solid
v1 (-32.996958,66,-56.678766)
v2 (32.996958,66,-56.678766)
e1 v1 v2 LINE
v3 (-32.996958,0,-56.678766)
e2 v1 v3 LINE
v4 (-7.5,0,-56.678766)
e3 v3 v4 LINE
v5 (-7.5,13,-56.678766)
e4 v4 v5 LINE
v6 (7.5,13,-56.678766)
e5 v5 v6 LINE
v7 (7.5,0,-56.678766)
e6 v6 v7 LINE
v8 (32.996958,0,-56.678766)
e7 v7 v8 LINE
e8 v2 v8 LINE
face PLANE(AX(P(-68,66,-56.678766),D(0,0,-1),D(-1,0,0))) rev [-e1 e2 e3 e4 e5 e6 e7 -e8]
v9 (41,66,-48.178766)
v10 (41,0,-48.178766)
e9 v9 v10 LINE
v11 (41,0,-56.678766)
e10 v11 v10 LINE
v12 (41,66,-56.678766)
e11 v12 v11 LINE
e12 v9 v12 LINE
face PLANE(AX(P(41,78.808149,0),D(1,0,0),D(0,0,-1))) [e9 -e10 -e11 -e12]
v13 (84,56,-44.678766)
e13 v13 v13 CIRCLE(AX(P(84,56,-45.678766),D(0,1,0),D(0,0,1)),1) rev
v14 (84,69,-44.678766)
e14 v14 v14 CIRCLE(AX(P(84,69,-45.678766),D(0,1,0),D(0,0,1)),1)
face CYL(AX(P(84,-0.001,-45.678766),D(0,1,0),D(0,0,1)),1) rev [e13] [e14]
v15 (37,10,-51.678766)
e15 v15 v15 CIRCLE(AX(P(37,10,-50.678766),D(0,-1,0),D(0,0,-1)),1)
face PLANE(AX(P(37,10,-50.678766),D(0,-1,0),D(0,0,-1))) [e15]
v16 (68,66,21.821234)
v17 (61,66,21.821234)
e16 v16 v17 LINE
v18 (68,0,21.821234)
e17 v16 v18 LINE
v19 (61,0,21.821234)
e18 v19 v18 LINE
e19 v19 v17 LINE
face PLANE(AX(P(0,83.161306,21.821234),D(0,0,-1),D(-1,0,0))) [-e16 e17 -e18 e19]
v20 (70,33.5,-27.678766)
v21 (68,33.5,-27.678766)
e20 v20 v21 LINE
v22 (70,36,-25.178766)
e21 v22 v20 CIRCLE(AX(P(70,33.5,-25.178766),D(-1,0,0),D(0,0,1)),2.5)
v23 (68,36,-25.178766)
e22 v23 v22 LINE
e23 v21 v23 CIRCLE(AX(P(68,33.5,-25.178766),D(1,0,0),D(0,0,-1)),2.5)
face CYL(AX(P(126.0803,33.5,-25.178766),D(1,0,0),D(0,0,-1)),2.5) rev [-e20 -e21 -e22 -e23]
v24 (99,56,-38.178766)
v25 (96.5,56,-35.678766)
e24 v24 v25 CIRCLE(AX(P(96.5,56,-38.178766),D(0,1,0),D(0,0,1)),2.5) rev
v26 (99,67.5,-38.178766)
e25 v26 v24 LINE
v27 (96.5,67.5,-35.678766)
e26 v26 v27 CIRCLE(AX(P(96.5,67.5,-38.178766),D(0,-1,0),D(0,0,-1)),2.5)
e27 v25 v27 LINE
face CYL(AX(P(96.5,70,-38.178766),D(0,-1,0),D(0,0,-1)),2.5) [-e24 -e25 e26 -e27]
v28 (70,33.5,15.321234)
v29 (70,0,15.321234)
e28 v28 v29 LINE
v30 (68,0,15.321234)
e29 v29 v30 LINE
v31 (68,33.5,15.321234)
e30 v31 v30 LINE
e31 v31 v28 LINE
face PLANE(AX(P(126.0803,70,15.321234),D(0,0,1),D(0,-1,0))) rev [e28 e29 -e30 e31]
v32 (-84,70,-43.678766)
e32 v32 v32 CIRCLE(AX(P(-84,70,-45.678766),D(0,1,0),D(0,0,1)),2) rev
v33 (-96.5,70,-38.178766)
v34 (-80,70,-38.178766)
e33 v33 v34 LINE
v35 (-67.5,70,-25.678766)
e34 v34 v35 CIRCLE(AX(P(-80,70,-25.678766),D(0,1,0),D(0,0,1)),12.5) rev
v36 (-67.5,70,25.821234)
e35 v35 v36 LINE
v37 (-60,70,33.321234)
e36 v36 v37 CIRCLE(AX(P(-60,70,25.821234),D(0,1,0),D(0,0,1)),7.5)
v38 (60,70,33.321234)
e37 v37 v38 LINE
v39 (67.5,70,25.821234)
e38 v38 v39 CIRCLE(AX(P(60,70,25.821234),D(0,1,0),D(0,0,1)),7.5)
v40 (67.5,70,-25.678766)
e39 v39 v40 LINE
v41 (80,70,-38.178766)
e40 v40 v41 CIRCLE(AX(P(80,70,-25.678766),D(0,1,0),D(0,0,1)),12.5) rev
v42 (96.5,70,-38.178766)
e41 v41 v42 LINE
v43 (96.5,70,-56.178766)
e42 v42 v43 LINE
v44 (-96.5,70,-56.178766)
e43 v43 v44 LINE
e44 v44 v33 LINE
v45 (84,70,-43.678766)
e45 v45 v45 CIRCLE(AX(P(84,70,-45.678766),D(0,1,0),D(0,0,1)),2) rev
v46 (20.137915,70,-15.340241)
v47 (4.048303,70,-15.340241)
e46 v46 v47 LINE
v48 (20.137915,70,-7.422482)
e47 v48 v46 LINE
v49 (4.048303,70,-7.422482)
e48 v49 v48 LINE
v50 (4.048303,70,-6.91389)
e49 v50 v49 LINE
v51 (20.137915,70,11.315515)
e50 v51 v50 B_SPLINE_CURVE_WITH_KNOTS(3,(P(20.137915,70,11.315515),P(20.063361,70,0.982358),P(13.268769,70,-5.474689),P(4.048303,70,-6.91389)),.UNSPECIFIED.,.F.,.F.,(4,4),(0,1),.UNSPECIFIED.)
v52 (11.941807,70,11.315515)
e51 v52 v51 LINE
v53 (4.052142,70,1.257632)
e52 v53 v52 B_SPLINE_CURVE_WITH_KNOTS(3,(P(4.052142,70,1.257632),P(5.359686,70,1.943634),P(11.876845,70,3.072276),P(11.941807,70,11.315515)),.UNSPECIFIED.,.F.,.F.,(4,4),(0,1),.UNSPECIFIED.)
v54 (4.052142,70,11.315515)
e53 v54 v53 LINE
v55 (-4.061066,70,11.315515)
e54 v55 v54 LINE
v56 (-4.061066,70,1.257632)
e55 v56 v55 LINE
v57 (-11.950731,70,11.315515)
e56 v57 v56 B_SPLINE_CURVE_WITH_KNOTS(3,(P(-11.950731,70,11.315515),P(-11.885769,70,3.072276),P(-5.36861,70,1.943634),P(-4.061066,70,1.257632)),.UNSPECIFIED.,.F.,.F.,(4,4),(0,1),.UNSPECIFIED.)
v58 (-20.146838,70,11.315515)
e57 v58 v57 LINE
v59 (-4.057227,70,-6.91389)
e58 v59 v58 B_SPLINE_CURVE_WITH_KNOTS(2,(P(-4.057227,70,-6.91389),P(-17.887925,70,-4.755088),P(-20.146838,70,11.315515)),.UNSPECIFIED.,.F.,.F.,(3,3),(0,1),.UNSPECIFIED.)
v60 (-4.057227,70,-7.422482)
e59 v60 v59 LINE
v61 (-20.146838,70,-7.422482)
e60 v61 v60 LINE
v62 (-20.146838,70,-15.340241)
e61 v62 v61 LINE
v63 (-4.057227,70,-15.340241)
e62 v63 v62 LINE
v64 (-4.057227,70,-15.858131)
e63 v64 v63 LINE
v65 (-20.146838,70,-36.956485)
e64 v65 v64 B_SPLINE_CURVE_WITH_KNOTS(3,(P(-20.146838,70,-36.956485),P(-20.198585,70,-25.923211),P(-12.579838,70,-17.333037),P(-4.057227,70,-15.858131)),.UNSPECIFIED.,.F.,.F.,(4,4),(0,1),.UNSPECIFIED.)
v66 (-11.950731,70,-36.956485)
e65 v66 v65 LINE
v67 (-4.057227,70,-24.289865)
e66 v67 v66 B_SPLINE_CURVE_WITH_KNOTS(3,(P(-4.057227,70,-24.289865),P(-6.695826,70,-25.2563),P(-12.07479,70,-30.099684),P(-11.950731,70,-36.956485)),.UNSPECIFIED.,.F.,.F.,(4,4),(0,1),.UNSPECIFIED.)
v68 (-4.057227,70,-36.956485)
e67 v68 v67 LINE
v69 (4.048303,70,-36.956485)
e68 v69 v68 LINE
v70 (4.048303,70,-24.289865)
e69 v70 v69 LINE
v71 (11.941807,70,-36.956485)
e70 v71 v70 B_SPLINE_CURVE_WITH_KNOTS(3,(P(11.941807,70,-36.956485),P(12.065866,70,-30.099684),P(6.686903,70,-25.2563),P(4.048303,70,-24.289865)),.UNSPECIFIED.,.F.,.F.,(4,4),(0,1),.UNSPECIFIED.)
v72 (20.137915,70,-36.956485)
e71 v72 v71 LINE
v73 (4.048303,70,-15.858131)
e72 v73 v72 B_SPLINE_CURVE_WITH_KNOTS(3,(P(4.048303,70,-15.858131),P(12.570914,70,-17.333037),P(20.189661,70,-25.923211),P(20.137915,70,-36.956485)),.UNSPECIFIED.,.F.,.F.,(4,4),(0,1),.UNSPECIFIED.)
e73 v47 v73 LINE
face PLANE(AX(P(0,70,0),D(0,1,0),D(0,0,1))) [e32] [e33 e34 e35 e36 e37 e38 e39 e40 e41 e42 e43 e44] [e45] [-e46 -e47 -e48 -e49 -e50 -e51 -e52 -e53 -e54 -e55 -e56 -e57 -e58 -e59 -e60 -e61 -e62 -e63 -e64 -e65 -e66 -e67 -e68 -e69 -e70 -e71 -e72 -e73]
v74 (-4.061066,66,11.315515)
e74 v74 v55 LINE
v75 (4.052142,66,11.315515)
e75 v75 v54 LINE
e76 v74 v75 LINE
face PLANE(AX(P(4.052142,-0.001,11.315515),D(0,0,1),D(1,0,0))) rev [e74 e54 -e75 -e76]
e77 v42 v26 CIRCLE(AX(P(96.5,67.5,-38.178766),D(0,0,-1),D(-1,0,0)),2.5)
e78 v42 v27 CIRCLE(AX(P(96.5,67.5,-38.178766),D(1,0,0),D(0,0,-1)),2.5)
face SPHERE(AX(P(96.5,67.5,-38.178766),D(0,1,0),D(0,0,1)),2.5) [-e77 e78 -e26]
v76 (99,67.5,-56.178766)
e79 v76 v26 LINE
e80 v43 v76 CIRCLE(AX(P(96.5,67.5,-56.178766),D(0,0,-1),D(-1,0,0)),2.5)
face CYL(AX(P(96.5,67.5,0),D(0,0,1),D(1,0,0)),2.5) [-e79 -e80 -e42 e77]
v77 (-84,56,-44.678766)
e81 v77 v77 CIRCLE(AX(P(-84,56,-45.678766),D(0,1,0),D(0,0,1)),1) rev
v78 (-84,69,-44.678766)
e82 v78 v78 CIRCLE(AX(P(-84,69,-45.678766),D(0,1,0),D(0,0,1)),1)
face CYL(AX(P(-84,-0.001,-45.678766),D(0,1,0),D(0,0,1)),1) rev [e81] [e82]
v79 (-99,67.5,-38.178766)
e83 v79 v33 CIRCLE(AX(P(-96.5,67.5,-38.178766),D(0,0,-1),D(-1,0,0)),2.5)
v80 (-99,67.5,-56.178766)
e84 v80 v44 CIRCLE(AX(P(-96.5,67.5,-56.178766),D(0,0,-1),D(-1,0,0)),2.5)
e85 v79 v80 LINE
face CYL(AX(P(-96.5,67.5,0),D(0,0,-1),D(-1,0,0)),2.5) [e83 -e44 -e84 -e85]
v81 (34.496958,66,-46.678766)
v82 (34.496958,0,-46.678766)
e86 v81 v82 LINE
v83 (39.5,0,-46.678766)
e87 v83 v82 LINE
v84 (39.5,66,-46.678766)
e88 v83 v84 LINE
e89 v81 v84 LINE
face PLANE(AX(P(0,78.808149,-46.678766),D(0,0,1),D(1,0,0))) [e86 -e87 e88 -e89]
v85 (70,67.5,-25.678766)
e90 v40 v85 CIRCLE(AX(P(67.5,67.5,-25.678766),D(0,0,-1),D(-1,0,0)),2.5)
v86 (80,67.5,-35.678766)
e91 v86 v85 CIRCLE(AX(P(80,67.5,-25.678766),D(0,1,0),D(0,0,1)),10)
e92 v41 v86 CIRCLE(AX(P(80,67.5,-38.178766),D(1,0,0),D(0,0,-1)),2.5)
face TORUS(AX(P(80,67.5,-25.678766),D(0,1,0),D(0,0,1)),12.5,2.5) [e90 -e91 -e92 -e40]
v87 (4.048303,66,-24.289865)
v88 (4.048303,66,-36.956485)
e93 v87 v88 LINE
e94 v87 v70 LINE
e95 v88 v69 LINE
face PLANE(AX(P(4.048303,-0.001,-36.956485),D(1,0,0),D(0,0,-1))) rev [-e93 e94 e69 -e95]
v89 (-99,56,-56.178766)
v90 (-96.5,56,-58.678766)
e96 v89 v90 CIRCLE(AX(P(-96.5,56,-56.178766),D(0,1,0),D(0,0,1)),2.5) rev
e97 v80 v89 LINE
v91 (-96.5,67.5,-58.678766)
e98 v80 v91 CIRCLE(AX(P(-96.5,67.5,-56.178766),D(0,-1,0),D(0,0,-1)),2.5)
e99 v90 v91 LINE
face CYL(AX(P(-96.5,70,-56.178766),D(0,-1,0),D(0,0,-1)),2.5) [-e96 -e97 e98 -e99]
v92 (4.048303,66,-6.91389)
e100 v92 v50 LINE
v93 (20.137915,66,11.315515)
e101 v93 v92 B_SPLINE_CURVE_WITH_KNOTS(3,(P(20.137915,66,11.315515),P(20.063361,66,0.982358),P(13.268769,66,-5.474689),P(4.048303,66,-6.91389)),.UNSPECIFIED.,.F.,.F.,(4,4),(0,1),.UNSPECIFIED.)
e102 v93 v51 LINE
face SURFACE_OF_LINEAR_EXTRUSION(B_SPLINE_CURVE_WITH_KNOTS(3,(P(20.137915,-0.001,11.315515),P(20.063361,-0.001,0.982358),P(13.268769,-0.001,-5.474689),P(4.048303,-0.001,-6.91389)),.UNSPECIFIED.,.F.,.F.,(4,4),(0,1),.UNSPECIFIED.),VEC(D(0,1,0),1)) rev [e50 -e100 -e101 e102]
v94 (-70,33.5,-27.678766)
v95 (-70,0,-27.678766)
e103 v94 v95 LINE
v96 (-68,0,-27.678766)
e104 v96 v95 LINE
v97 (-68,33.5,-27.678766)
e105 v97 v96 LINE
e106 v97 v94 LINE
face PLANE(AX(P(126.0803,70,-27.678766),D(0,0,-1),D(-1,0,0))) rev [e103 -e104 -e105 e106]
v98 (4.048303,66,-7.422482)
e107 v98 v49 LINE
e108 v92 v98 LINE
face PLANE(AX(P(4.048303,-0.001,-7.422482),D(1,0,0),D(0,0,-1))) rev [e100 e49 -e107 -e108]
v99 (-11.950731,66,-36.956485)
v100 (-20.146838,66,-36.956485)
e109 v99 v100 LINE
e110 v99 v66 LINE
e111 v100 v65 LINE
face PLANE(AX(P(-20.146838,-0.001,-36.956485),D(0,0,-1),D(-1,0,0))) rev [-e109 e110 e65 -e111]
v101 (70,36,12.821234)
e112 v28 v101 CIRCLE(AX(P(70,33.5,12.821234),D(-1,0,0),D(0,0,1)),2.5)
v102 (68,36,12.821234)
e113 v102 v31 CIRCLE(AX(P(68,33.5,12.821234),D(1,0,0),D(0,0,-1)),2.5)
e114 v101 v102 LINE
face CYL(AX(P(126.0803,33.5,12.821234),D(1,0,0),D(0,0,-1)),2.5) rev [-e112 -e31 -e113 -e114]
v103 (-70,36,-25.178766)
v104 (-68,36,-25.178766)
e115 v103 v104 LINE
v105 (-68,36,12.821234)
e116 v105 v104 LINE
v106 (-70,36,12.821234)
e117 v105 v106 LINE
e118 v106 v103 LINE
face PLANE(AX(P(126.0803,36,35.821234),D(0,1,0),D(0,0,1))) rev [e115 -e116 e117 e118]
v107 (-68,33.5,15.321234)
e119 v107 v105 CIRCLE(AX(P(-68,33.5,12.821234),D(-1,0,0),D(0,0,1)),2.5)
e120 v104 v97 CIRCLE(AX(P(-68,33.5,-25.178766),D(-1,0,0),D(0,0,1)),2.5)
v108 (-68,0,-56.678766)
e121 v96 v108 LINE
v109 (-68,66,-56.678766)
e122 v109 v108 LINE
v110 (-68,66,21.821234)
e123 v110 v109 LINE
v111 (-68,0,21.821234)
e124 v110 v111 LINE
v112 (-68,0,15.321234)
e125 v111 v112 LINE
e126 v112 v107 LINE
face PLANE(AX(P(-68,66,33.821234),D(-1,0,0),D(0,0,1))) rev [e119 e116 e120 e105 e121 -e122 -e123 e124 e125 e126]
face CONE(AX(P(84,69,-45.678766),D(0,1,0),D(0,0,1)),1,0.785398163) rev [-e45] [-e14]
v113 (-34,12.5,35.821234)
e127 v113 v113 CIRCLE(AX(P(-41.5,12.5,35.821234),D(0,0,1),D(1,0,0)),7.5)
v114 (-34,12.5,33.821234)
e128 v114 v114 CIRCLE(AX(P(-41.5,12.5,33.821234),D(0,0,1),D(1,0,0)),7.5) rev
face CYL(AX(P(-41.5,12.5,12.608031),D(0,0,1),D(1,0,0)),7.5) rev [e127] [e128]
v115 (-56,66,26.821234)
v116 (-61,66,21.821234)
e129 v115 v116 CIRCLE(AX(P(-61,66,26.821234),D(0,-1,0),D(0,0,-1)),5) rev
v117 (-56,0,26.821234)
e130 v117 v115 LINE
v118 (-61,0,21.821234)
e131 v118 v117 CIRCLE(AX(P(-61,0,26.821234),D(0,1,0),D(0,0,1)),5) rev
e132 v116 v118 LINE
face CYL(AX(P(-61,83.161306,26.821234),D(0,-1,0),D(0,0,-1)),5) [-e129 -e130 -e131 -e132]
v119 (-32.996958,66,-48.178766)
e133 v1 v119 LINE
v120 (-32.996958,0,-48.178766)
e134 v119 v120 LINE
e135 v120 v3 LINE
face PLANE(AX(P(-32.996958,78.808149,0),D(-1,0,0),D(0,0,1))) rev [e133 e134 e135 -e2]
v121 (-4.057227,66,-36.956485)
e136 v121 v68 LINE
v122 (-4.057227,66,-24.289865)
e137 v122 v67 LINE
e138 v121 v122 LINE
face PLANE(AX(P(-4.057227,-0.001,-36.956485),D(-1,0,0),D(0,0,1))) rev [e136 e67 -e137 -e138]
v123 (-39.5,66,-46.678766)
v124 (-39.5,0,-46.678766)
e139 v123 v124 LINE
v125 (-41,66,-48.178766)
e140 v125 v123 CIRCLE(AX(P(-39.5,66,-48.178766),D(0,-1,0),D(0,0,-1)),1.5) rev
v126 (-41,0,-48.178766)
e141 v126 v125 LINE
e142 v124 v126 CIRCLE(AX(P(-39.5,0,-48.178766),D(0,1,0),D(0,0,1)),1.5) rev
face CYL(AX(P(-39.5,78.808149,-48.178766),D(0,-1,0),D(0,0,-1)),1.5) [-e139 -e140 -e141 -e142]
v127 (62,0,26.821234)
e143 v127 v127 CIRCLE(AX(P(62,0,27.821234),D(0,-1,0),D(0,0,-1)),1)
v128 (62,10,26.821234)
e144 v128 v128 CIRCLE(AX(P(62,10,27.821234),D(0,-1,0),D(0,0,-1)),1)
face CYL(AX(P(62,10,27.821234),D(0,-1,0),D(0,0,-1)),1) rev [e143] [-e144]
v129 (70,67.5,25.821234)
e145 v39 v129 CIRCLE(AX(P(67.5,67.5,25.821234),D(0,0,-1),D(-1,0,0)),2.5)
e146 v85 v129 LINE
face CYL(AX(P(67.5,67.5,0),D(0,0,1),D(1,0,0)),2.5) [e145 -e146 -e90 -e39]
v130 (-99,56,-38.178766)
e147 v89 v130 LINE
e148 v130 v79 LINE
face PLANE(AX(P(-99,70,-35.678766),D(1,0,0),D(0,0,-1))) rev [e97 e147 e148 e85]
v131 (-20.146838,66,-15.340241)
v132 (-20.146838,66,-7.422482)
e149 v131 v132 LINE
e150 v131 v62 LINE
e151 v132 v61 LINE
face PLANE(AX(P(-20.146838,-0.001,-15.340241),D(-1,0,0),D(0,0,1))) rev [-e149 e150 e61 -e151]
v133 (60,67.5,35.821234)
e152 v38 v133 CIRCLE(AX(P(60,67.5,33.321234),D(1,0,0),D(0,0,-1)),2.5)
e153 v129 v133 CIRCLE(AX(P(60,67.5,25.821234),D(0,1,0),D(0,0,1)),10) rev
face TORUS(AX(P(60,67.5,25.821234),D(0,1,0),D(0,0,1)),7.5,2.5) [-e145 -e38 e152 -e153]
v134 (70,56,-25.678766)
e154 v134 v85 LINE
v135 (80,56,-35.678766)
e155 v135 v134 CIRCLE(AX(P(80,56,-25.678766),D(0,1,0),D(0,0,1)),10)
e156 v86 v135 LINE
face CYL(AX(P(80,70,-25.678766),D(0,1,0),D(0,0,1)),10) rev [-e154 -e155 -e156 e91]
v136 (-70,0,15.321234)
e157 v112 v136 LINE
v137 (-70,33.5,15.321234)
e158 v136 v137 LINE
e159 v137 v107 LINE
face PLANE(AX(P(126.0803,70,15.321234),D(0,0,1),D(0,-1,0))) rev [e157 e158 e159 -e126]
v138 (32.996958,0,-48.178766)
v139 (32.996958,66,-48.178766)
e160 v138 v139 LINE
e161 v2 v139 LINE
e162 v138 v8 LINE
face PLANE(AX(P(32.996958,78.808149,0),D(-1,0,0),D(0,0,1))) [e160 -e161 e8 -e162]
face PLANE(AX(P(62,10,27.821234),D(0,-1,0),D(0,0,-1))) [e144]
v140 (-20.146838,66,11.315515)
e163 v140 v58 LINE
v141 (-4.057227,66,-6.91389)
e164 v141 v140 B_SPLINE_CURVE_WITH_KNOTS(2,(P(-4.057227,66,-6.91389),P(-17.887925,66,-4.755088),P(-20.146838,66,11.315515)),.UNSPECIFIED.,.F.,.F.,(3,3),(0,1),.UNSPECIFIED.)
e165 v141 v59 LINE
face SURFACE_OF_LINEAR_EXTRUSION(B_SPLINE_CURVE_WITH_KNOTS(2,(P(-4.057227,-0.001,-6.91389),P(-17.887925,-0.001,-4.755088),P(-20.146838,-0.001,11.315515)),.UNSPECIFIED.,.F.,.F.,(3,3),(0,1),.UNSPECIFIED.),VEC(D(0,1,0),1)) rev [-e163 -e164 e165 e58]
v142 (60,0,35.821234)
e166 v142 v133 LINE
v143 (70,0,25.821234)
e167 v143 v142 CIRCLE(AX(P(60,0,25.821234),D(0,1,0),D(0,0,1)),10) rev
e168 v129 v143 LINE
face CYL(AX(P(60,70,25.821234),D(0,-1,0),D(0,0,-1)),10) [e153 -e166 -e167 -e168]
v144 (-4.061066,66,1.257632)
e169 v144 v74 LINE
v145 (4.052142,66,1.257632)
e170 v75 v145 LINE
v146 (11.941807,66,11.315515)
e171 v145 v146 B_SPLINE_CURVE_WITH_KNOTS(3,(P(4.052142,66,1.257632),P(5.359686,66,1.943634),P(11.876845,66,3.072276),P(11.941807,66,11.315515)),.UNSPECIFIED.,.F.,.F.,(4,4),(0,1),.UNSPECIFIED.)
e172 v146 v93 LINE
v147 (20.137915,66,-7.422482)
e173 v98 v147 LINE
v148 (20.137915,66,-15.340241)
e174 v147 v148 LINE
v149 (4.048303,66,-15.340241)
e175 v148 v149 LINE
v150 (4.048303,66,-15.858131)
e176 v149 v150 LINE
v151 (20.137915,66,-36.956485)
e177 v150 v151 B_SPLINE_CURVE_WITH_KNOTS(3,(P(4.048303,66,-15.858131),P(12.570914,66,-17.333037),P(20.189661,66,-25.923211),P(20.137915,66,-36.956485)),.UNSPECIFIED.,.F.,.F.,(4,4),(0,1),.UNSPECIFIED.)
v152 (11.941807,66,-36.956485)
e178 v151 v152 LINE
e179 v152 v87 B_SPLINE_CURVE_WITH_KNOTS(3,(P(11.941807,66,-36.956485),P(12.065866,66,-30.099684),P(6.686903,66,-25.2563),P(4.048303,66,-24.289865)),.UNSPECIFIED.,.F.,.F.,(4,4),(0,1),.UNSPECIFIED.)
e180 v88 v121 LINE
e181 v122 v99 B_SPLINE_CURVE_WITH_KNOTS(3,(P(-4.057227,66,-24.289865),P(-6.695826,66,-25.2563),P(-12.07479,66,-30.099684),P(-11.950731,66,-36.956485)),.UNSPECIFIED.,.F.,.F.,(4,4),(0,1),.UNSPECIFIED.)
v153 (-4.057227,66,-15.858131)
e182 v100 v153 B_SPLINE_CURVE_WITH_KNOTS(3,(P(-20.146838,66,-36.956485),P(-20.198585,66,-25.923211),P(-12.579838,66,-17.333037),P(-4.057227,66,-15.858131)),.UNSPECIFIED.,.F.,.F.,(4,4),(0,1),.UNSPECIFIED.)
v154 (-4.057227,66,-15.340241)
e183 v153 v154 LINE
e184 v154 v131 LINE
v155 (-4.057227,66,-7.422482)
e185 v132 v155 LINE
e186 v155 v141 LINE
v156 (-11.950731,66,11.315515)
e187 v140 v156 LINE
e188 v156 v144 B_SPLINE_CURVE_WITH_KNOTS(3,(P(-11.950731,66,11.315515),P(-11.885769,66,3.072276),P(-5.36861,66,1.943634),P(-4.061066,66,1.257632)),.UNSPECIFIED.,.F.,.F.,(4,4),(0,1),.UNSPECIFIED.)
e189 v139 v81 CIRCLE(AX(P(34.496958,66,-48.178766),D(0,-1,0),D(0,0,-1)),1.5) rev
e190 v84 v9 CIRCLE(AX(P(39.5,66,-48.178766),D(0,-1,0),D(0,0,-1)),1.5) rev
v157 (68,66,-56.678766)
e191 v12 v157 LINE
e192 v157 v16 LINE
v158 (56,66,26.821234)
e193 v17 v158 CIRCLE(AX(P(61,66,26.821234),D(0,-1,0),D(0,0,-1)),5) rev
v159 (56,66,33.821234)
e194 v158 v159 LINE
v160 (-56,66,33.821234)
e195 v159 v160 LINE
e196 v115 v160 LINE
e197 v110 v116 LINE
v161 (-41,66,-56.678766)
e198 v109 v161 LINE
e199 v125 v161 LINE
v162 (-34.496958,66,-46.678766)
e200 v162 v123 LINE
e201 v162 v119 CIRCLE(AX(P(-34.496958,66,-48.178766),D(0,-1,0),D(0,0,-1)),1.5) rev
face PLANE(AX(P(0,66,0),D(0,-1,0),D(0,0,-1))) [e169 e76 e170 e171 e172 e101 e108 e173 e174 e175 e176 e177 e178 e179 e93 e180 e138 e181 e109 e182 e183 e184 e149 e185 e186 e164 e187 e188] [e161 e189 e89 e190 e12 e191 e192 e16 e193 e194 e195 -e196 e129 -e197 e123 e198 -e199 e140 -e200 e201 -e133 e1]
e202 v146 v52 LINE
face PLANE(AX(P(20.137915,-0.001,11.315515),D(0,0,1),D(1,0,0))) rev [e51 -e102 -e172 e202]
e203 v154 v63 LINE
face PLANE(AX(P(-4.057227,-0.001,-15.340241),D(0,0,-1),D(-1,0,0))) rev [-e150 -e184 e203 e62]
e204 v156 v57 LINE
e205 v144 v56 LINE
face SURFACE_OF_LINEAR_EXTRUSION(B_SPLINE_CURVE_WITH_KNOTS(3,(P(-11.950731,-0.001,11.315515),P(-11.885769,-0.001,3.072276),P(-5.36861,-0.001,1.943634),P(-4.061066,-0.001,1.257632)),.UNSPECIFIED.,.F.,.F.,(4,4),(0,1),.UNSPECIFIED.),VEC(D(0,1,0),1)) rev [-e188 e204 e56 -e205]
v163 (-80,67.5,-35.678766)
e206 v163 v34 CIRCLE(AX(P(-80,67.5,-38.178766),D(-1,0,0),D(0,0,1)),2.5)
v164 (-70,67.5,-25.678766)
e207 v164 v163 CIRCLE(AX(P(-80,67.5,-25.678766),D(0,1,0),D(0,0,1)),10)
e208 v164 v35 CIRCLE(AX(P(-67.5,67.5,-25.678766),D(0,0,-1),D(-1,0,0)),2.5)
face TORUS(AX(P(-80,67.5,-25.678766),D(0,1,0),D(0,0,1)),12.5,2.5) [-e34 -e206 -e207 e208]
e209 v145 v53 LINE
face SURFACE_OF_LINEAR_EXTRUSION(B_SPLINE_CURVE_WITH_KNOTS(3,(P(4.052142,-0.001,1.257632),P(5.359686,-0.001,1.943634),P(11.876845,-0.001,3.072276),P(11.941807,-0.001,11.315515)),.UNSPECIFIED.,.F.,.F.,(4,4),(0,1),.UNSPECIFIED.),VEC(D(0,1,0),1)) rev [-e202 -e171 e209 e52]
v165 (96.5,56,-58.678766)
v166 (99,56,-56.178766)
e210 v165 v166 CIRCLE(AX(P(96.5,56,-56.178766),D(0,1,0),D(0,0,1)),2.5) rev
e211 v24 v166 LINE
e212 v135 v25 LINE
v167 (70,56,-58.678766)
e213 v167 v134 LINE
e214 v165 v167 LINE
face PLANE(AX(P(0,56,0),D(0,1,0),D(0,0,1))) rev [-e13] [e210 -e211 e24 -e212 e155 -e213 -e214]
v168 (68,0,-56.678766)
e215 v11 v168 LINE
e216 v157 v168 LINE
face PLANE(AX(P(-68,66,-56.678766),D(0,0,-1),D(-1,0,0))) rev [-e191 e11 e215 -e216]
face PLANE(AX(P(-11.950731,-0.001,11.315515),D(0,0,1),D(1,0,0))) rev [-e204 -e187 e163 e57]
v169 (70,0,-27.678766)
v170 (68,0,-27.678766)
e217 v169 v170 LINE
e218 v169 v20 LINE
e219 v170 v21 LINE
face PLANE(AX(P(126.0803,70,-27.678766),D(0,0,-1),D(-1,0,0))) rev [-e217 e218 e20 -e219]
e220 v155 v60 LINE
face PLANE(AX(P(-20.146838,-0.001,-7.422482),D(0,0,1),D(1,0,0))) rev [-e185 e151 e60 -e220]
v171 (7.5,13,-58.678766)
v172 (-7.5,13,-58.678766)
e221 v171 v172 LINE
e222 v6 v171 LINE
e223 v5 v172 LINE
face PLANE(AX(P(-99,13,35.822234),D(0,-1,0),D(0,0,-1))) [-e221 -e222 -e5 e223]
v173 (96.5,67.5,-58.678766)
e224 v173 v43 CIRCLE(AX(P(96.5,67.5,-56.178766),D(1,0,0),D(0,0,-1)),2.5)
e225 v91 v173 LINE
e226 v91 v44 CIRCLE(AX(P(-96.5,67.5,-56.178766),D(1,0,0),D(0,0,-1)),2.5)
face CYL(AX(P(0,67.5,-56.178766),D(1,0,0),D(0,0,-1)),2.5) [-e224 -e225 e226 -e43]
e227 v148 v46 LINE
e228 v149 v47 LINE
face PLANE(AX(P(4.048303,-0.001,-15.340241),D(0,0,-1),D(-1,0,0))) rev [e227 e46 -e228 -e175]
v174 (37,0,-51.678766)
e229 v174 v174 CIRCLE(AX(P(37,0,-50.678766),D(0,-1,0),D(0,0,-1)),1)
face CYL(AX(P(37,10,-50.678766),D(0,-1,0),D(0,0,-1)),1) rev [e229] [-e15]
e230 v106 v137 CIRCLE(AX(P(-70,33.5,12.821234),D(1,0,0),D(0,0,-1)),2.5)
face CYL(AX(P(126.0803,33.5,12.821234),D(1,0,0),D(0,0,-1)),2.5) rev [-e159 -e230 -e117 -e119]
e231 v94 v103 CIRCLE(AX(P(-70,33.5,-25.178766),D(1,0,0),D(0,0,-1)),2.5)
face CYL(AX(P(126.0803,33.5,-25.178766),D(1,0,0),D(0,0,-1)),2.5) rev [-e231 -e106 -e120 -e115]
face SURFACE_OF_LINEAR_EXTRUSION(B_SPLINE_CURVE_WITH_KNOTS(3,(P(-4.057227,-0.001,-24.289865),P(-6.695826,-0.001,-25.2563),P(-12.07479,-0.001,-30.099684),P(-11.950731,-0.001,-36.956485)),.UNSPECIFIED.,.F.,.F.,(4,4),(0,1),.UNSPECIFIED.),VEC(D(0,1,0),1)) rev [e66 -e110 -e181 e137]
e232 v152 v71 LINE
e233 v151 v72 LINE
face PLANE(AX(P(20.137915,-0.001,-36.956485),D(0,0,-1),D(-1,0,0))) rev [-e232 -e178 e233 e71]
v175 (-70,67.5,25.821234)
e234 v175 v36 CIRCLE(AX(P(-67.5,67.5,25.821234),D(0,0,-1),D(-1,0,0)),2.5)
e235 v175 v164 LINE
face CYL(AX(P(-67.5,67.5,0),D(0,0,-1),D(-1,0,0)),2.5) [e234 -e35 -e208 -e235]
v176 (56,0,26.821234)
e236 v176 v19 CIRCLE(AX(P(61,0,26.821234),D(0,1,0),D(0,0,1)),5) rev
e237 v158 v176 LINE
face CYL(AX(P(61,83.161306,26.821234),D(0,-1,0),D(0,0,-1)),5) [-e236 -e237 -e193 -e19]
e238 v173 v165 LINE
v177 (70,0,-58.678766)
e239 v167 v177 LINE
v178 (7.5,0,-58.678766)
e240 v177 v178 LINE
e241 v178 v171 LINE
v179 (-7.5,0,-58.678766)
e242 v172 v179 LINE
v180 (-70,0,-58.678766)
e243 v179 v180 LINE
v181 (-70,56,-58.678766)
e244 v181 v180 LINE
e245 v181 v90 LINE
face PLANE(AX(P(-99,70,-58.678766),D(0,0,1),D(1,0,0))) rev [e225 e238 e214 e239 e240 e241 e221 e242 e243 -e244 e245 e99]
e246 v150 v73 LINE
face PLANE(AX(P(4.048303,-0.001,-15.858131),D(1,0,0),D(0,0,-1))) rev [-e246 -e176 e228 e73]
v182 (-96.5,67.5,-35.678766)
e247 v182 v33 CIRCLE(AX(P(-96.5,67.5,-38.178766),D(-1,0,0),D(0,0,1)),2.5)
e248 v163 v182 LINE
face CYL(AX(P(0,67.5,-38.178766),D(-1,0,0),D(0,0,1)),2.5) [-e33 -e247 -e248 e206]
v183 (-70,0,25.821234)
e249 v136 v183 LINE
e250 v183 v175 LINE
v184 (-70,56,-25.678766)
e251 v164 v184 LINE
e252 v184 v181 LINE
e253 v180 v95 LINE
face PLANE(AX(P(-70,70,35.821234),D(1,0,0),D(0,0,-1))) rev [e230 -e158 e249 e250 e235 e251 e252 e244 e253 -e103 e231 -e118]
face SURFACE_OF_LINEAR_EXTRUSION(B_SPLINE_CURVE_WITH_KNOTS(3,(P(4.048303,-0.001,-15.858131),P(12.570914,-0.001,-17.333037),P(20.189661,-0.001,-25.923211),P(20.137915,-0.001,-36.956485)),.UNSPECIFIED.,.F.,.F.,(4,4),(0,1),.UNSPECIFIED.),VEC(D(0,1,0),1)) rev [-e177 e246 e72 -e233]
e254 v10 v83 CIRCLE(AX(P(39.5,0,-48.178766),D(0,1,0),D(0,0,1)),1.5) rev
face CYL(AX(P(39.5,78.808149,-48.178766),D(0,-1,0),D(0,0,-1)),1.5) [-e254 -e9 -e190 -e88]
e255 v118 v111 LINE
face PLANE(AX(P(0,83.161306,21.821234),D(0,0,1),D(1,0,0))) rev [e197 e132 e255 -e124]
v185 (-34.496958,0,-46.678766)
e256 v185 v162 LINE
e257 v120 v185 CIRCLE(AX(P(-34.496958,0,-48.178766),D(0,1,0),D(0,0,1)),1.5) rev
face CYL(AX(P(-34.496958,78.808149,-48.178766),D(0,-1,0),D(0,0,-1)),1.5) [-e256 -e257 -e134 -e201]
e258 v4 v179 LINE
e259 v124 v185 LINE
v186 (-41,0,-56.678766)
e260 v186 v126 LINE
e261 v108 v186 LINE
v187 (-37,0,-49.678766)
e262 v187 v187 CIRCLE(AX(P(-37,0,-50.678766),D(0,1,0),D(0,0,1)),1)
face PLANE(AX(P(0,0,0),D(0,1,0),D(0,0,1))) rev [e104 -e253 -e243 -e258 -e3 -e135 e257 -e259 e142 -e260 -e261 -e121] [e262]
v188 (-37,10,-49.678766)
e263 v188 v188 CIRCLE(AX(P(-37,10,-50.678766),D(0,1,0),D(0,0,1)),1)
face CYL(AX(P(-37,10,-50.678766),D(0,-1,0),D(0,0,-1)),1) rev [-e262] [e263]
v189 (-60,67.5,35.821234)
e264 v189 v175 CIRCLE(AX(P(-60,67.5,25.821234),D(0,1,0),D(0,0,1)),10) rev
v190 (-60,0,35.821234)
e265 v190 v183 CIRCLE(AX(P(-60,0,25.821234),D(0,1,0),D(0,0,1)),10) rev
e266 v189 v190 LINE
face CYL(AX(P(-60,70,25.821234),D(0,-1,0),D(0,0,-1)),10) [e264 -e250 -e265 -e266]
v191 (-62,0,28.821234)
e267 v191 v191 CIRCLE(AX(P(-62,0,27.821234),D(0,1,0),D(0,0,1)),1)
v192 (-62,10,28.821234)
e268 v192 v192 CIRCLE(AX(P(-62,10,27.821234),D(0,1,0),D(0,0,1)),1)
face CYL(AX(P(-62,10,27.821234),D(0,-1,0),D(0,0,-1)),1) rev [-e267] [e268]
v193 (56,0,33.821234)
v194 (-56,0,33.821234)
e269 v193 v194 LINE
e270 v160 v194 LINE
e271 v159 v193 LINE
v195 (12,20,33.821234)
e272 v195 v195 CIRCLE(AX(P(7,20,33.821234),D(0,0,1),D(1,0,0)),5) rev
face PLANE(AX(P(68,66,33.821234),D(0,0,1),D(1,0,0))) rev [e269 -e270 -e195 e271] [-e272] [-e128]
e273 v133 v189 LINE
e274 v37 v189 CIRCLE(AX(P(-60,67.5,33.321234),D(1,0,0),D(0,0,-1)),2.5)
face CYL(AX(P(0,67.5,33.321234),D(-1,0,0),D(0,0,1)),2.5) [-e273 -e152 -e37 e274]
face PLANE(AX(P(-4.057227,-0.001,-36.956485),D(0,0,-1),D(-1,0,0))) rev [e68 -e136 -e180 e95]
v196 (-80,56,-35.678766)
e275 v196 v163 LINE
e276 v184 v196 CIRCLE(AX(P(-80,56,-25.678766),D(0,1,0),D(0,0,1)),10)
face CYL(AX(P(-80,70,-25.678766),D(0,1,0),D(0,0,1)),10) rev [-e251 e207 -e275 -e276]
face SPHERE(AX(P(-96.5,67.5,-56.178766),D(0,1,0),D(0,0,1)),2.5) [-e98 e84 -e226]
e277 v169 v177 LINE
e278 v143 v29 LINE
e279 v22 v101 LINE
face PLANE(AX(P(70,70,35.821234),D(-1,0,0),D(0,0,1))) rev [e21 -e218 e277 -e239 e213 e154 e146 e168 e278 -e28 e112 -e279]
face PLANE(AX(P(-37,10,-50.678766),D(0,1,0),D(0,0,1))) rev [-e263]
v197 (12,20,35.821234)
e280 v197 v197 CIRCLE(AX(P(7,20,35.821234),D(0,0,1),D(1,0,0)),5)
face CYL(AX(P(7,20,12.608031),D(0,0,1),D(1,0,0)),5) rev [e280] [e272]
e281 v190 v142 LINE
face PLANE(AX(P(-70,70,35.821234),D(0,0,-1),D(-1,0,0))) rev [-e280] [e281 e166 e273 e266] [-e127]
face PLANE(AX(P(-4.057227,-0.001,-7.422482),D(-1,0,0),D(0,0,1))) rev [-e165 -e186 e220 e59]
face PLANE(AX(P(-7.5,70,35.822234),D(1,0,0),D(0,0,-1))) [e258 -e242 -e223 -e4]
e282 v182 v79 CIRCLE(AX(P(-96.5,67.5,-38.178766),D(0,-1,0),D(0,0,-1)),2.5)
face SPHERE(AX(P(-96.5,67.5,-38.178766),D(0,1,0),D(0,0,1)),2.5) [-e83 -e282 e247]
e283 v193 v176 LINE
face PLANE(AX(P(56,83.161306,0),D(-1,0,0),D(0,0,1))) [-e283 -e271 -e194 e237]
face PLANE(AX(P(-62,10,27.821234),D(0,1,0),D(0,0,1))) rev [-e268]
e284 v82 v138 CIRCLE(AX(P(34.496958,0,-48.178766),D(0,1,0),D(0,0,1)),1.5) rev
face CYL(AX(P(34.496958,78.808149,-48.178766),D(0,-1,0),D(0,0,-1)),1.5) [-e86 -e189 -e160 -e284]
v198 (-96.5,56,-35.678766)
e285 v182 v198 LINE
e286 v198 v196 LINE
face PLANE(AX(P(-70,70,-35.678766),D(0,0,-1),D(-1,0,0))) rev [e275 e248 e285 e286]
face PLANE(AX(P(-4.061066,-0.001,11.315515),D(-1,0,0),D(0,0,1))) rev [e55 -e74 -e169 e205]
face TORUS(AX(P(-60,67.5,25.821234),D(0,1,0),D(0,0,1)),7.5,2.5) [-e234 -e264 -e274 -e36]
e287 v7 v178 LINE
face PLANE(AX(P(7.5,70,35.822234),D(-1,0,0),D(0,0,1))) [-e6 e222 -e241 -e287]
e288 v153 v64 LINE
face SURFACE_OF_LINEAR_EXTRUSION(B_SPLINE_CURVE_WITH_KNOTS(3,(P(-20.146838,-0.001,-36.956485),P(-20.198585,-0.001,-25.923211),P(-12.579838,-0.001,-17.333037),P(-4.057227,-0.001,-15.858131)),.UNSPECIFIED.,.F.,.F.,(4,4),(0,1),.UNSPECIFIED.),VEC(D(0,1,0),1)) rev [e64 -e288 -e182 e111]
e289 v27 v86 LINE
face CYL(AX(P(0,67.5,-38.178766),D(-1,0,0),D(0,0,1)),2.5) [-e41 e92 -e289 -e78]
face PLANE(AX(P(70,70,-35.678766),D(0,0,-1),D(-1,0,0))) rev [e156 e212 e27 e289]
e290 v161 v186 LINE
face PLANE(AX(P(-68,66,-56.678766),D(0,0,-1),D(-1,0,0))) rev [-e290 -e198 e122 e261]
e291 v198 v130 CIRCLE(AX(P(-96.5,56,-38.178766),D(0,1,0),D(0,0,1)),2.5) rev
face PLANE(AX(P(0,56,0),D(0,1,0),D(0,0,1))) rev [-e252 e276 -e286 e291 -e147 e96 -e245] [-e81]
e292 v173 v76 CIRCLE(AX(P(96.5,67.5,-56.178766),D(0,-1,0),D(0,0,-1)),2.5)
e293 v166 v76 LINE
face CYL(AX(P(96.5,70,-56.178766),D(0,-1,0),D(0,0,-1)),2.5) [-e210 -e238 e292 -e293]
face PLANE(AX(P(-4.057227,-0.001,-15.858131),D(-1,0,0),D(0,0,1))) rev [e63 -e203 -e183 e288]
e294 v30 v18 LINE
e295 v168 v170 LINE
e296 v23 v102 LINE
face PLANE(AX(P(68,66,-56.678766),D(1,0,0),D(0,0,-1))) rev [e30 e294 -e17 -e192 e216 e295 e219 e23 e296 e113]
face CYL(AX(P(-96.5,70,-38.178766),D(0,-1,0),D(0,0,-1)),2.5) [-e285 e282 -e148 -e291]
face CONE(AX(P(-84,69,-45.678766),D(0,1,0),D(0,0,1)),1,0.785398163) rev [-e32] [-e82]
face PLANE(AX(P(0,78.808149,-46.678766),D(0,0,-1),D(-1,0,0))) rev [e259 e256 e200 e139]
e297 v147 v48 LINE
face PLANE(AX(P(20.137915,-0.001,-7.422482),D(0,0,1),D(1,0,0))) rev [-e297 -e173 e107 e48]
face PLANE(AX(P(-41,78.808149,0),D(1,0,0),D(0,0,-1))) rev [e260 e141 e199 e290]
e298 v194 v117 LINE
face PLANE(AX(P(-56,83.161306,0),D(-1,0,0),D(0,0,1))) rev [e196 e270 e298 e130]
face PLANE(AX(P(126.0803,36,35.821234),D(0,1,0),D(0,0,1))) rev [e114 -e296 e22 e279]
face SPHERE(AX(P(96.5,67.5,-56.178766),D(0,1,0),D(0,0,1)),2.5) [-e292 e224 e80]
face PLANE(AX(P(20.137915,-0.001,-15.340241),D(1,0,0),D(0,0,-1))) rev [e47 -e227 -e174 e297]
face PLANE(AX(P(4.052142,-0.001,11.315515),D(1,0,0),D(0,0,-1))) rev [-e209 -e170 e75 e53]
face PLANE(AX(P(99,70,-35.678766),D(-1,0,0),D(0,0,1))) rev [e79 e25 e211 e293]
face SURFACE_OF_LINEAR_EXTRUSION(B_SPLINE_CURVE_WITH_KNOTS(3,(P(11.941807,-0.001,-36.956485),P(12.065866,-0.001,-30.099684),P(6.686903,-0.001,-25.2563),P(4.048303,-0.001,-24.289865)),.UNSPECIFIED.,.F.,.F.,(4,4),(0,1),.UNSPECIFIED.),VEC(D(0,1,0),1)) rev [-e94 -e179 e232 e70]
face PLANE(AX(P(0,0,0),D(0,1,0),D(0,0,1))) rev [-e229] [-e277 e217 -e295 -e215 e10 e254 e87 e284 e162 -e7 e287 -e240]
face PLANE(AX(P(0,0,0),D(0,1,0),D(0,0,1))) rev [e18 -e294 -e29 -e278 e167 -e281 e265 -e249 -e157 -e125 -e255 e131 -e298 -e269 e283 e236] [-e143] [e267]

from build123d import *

# Parameters (mm, degrees)
SALIENTE_EXTRUIR1_DEPTH = 70
CORTAR_EXTRUIR1_START   = -70
CROQUIS2_W              = 29
CROQUIS2_H              = 23
CORTAR_EXTRUIR1_DEPTH   = 56
CROQUIS3_W              = 136
CROQUIS3_H              = 90.5
CORTAR_EXTRUIR2_DEPTH   = 66
REDONDEO5_R             = 10
REDONDEO13_R            = 2.5
REDONDEO14_R            = 10
REDONDEO15_R            = 10
CROQUIS7_W              = 15
CROQUIS7_H              = 13
CORTAR_EXTRUIR4_DEPTH   = 2
CROQUIS8_W              = 43
CROQUIS8_H              = 36
CORTAR_EXTRUIR5_DEPTH   = 140
CROQUIS9_R              = 7.5
CROQUIS9_R_2            = 5
CORTAR_EXTRUIR6_DEPTH   = 2
CROQUIS10_R             = 1
SALIENTE_EXTRUIR8_DEPTH = 66
CROQUIS10_4_R           = 1
CORTAR_EXTRUIR7_DEPTH   = 10
REDONDEO18_R            = 5
CROQUIS12_W             = 8.003042052
CROQUIS12_H             = 10
CROQUIS12_R             = 1
SALIENTE_EXTRUIR9_DEPTH = 66
CROQUIS12_3_R           = 1
CORTAR_EXTRUIR8_DEPTH   = 10
REDONDEO19_R            = 1.5
CORTAR_EXTRUIR9_REACH   = 136.7
CROQUIS13_R             = 1
REDONDEO20_R            = 2.5
CHAFL_N1_SIZE           = 1
CORTAR_EXTRUIR10_REACH  = 136.7
REDONDEO21_R            = 2.5


with BuildPart() as part:
    # Croquis1 → Saliente-Extruir1 (new body)
    with BuildSketch(Plane(origin=(0, 0, 0), x_dir=(1, 0, 0), z_dir=(0, 1, 0))):
        Polygon((-70, -35.821234201), (70, -35.821234201), (70, 35.678765799), (99, 35.678765799), (99, 58.678765799), (-99, 58.678765799), (-99, 35.678765799), (-70, 35.678765799), align=None)
    extrude(amount=SALIENTE_EXTRUIR1_DEPTH)

    # Croquis2 → Cortar-Extruir1 (cut)
    with BuildSketch(Plane(origin=(0, 70, 0), x_dir=(1, 0, 0), z_dir=(0, 1, 0)).offset(CORTAR_EXTRUIR1_START)):
        with Locations((-84.5, 47.178765799)):
            Rectangle(CROQUIS2_W, CROQUIS2_H)
        with Locations((84.5, 47.178765799)):
            Rectangle(CROQUIS2_W, CROQUIS2_H)
    extrude(amount=CORTAR_EXTRUIR1_DEPTH, mode=Mode.SUBTRACT)

    # Croquis3 → Cortar-Extruir2 (cut)
    with BuildSketch(Plane.XZ):
        with Locations((0, -11.428765799)):
            Rectangle(CROQUIS3_W, CROQUIS3_H)
    extrude(amount=-CORTAR_EXTRUIR2_DEPTH, mode=Mode.SUBTRACT)

    # Redondeo5
    redondeo5_edges = [part.edges().sort_by_distance(p)[0] for p in [
        (-70, 63, -35.678765799),
        (70, 63, -35.678765799),
    ]]
    fillet(redondeo5_edges, radius=REDONDEO5_R)

    # Redondeo13
    redondeo13_edges = [part.edges().sort_by_distance(p)[0] for p in [
        (-99, 63, -35.678765799),
        (-99, 63, -58.678765799),
        (99, 63, -58.678765799),
        (99, 63, -35.678765799),
    ]]
    fillet(redondeo13_edges, radius=REDONDEO13_R)

    # Redondeo14
    redondeo14_edges = [part.edges().sort_by_distance(p)[0] for p in [
        (-68, 33, 33.821234201),
        (68, 33, 33.821234201),
    ]]
    fillet(redondeo14_edges, radius=REDONDEO14_R)

    # Redondeo15
    redondeo15_edges = [part.edges().sort_by_distance(p)[0] for p in [
        (70, 35, 35.821234201),
        (-70, 35, 35.821234201),
    ]]
    fillet(redondeo15_edges, radius=REDONDEO15_R)

    # Croquis7 → Cortar-Extruir4 (cut)
    with BuildSketch(Plane(origin=(0, 0, -58.678765799), x_dir=(-1, 0, 0), z_dir=(0, 0, -1))):
        with Locations((0, 6.5)):
            Rectangle(CROQUIS7_W, CROQUIS7_H)
    extrude(amount=-CORTAR_EXTRUIR4_DEPTH, mode=Mode.SUBTRACT)

    # Croquis8 → Cortar-Extruir5 (cut)
    with BuildSketch(Plane.ZY.offset(70)):
        with Locations((-6.178765799, 18)):
            Rectangle(CROQUIS8_W, CROQUIS8_H)
    extrude(amount=-CORTAR_EXTRUIR5_DEPTH, mode=Mode.SUBTRACT)

    # Croquis9 → Cortar-Extruir6 (cut)
    with BuildSketch(Plane.XY.offset(35.821234201)):
        with Locations((-41.5, 12.5)):
            Circle(CROQUIS9_R)
        with Locations((7, 20)):
            Circle(CROQUIS9_R_2)
    extrude(amount=-CORTAR_EXTRUIR6_DEPTH, mode=Mode.SUBTRACT)


with BuildPart() as saliente_extruir8_tool:
    # Croquis10 → Saliente-Extruir8 (new body)
    # profile 1 of 4: a face of its own
    with BuildSketch(Plane(origin=(0, 0, 0), x_dir=(1, 0, 0), z_dir=(0, 1, 0))):
        with BuildLine():
            ThreePointArc((-56, -33.821234201), (-65.071066479, -30.89230068), (-68, -21.821234201))
            Line((-68, -21.821234201), (-56, -21.821234201))
            Line((-56, -21.821234201), (-56, -33.821234201))
        make_face()
        with Locations((-62, -27.821234201)):
            Circle(CROQUIS10_R, mode=Mode.SUBTRACT)
    # profile 2 of 4: a face of its own
    with BuildSketch(Plane(origin=(0, 0, 0), x_dir=(1, 0, 0), z_dir=(0, 1, 0))):
        with Locations((-62, -27.821234201)):
            Circle(CROQUIS10_R)
    # profile 3 of 4: a face of its own
    with BuildSketch(Plane(origin=(0, 0, 0), x_dir=(1, 0, 0), z_dir=(0, 1, 0))):
        with BuildLine():
            Line((56, -33.821234201), (56, -21.821234201))
            Line((56, -21.821234201), (68, -21.821234201))
            ThreePointArc((68, -21.821234201), (65.071066479, -30.89230068), (56, -33.821234201))
        make_face()
        with Locations((62, -27.821234201)):
            Circle(CROQUIS10_R, mode=Mode.SUBTRACT)
    # profile 4 of 4: a face of its own
    with BuildSketch(Plane(origin=(0, 0, 0), x_dir=(1, 0, 0), z_dir=(0, 1, 0))):
        with Locations((62, -27.821234201)):
            Circle(CROQUIS10_R)
    extrude(amount=SALIENTE_EXTRUIR8_DEPTH)


with BuildPart() as part_1:
    add(part.part)


with BuildPart() as part_2:
    # Saliente-Extruir8: joined with saliente_extruir8_tool
    add(part_1.part.fuse(saliente_extruir8_tool.part, tol=0.00001))

    # Croquis10<4> → Cortar-Extruir7 (cut)
    with BuildSketch(Plane(origin=(0, 0, 0), x_dir=(1, 0, 0), z_dir=(0, 1, 0))):
        with Locations(Location((-62, -27.821234201, 0), (0, 0, 270))):
            Circle(CROQUIS10_4_R)
        with Locations(Location((62, -27.821234201, 0), (0, 0, 90))):
            Circle(CROQUIS10_4_R)
    extrude(amount=CORTAR_EXTRUIR7_DEPTH, mode=Mode.SUBTRACT)

    # Redondeo18
    redondeo18_edges = [part_2.edges().sort_by_distance(p)[0] for p in [
        (-56, 33, 21.821234201),
        (56, 33, 21.821234201),
    ]]
    fillet(redondeo18_edges, radius=REDONDEO18_R)

    # Croquis12 → Saliente-Extruir9 (add)
    # profile 1 of 4: a face of its own
    with BuildSketch(Plane(origin=(0, 0, 0), x_dir=(1, 0, 0), z_dir=(0, 1, 0))):
        with Locations((-36.998478974, 51.678765799)):
            Rectangle(CROQUIS12_W, CROQUIS12_H)
        with Locations((-37, 50.678765799)):
            Circle(CROQUIS12_R, mode=Mode.SUBTRACT)
    # profile 2 of 4: a face of its own
    with BuildSketch(Plane(origin=(0, 0, 0), x_dir=(1, 0, 0), z_dir=(0, 1, 0))):
        with Locations((-37, 50.678765799)):
            Circle(CROQUIS12_R)
    # profile 3 of 4: a face of its own
    with BuildSketch(Plane(origin=(0, 0, 0), x_dir=(1, 0, 0), z_dir=(0, 1, 0))):
        with Locations((36.998478974, 51.678765799)):
            Rectangle(CROQUIS12_W, CROQUIS12_H)
        with Locations((37, 50.678765799)):
            Circle(CROQUIS12_R, mode=Mode.SUBTRACT)
    # profile 4 of 4: a face of its own
    with BuildSketch(Plane(origin=(0, 0, 0), x_dir=(1, 0, 0), z_dir=(0, 1, 0))):
        with Locations((37, 50.678765799)):
            Circle(CROQUIS12_R)
    extrude(amount=SALIENTE_EXTRUIR9_DEPTH)

    # Croquis12<3> → Cortar-Extruir8 (cut)
    with BuildSketch(Plane(origin=(0, 0, 0), x_dir=(1, 0, 0), z_dir=(0, 1, 0))):
        with Locations(Location((-37, 50.678765799, 0), (0, 0, 270))):
            Circle(CROQUIS12_3_R)
        with Locations(Location((37, 50.678765799, 0), (0, 0, 90))):
            Circle(CROQUIS12_3_R)
    extrude(amount=CORTAR_EXTRUIR8_DEPTH, mode=Mode.SUBTRACT)

    # Redondeo19
    redondeo19_edges = [part_2.edges().sort_by_distance(p)[0] for p in [
        (-41, 33, -46.678765799),
        (-32.996957948, 33, -46.678765799),
        (41, 33, -46.678765799),
        (32.996957948, 33, -46.678765799),
    ]]
    fillet(redondeo19_edges, radius=REDONDEO19_R)

    # Croquis13 → Cortar-Extruir9 (cut, up to next)
    with BuildSketch(Plane(origin=(0, 70, 0), x_dir=(1, 0, 0), z_dir=(0, 1, 0)), mode=Mode.PRIVATE) as cortar_extruir9_sk1:
        with Locations(Location((-84, 45.678765799, 0), (0, 0, 270))):
            Circle(CROQUIS13_R)
    cortar_extruir9_tool1 = extrude(cortar_extruir9_sk1.sketch, amount=-CORTAR_EXTRUIR9_REACH, mode=Mode.PRIVATE) & part_2.part
    # Croquis13 → Cortar-Extruir9 (cut, up to next)
    with BuildSketch(Plane(origin=(0, 70, 0), x_dir=(1, 0, 0), z_dir=(0, 1, 0)), mode=Mode.PRIVATE) as cortar_extruir9_sk2:
        with Locations(Location((84, 45.678765799, 0), (0, 0, 270))):
            Circle(CROQUIS13_R)
    cortar_extruir9_tool2 = extrude(cortar_extruir9_sk2.sketch, amount=-CORTAR_EXTRUIR9_REACH, mode=Mode.PRIVATE) & part_2.part
    add(cortar_extruir9_tool1.solids().sort_by_distance((-84, 70, -45.678766))[0], mode=Mode.SUBTRACT)
    add(cortar_extruir9_tool2.solids().sort_by_distance((84, 70, -45.678766))[0], mode=Mode.SUBTRACT)

    # Redondeo20
    redondeo20_edges = [part_2.edges().sort_by_distance(p)[0] for p in [
        (70, 70, 0.071234201),
        (0, 70, 35.821234201),
        (-67.071067812, 70, 32.892302013),
        (67.071067812, 70, 32.892302013),
        (88.25, 70, -35.678765799),
        (-70, 70, 0.071234201),
        (72.928932188, 70, -32.749833611),
        (-72.928932188, 70, -32.749833611),
        (99, 70, -47.178765799),
        (-88.25, 70, -35.678765799),
        (0, 70, -58.678765799),
        (-99, 70, -47.178765799),
        (-98.267766953, 70, -36.410998846),
        (-98.267766953, 70, -57.946532752),
        (98.267766953, 70, -57.946532752),
        (98.267766953, 70, -36.410998846),
    ]]
    fillet(redondeo20_edges, radius=REDONDEO20_R)

    # Chaflán1
    chafl_n1_edges = [part_2.edges().sort_by_distance(p)[0] for p in [
        (-84, 70, -46.678765799),
        (84, 70, -46.678765799),
    ]]
    chamfer(chafl_n1_edges, length=CHAFL_N1_SIZE)

    # Croquis14 → Cortar-Extruir10 (cut, up to next)
    with BuildSketch(Plane(origin=(0, 70, 0), x_dir=(1, 0, 0), z_dir=(0, 1, 0)), mode=Mode.PRIVATE) as cortar_extruir10_sk1:
        with BuildLine():
            Line((-20.146838321, 36.956484824), (-11.95073101, 36.956484824))
            add(Edge.make_bspline(
                [(-4.057227177, 24.289864733), (-6.695826358, 25.256300103), (-12.074790019, 30.099684352), (-11.95073101, 36.956484824)],
                knots=[0, 0, 0, 0, 1, 1, 1, 1], degree=3))
            Line((-4.057227177, 24.289864733), (-4.057227177, 36.956484824))
            Line((-4.057227177, 36.956484824), (-0.004461878, 36.956484824))
            Line((-0.004461878, 36.956484824), (4.048303421, 36.956484824))
            Line((4.048303421, 36.956484824), (4.048303421, 24.289864733))
            add(Edge.make_bspline(
                [(4.048303421, 24.289864733), (6.686902602, 25.256300103), (12.065866263, 30.099684352), (11.941807254, 36.956484824)],
                knots=[0, 0, 0, 0, 1, 1, 1, 1], degree=3))
            Line((11.941807254, 36.956484824), (20.137914565, 36.956484824))
            add(Edge.make_bspline(
                [(20.137914565, 36.956484824), (20.18966101, 25.923210578), (12.570913778, 17.333037065), (4.048303421, 15.858130647)],
                knots=[0, 0, 0, 0, 1, 1, 1, 1], degree=3))
            Line((4.048303421, 15.858130647), (4.048303421, 15.340241278))
            Line((4.048303421, 15.340241278), (20.137914565, 15.340241278))
            Line((20.137914565, 15.340241278), (20.137914565, 7.422481759))
            Line((20.137914565, 7.422481759), (4.048303421, 7.422481759))
            Line((4.048303421, 7.422481759), (4.048303421, 6.913890274))
            add(Edge.make_bspline(
                [(4.048303421, 6.913890274), (13.268768878, 5.474688597), (20.063360811, -0.98235836), (20.137914565, -11.315515176)],
                knots=[0, 0, 0, 0, 1, 1, 1, 1], degree=3))
            Line((20.137914565, -11.315515176), (12.224292823, -11.315515176))
            Line((12.224292823, -11.315515176), (11.941807254, -11.315515176))
            add(Edge.make_bspline(
                [(4.05214205, -1.257632017), (5.359686174, -1.943634241), (11.876845008, -3.072276016), (11.941807254, -11.315515176)],
                knots=[0, 0, 0, 0, 1, 1, 1, 1], degree=3))
            Line((4.05214205, -1.257632017), (4.05214205, -11.315515176))
            Line((4.05214205, -11.315515176), (-4.061065806, -11.315515176))
            Line((-4.061065806, -11.315515176), (-4.061065806, -1.257632017))
            add(Edge.make_bspline(
                [(-4.061065806, -1.257632017), (-5.36860993, -1.943634241), (-11.885768764, -3.072276016), (-11.95073101, -11.315515176)],
                knots=[0, 0, 0, 0, 1, 1, 1, 1], degree=3))
            Line((-11.95073101, -11.315515176), (-12.233216579, -11.315515176))
            Line((-12.233216579, -11.315515176), (-20.146838321, -11.315515176))
            add(Edge.make_bspline(
                [(-4.057227177, 6.913890274), (-17.887925363, 4.755087759), (-20.146838321, -11.315515176)],
                knots=[0, 0, 0, 1, 1, 1], degree=2))
            Line((-4.057227177, 6.913890274), (-4.057227177, 7.422481759))
            Line((-4.057227177, 7.422481759), (-20.146838321, 7.422481759))
            Line((-20.146838321, 7.422481759), (-20.146838321, 15.340241278))
            Line((-20.146838321, 15.340241278), (-4.057227177, 15.340241278))
            Line((-4.057227177, 15.340241278), (-4.057227177, 15.858130647))
            add(Edge.make_bspline(
                [(-20.146838321, 36.956484824), (-20.198584766, 25.923210578), (-12.579837534, 17.333037065), (-4.057227177, 15.858130647)],
                knots=[0, 0, 0, 0, 1, 1, 1, 1], degree=3))
        make_face()
    cortar_extruir10_tool1 = extrude(cortar_extruir10_sk1.sketch, amount=-CORTAR_EXTRUIR10_REACH, mode=Mode.PRIVATE) & part_2.part
    add(cortar_extruir10_tool1.solids().sort_by_distance((0.076213, 70, -12.699632))[0], mode=Mode.SUBTRACT)

    # Redondeo21
    redondeo21_edges = [part_2.edges().sort_by_distance(p)[0] for p in [
        (-69, 36, -27.678765799),
        (69, 36, -27.678765799),
        (-69, 36, 15.321234201),
        (69, 36, 15.321234201),
    ]]
    fillet(redondeo21_edges, radius=REDONDEO21_R)


solid = part_2.part
